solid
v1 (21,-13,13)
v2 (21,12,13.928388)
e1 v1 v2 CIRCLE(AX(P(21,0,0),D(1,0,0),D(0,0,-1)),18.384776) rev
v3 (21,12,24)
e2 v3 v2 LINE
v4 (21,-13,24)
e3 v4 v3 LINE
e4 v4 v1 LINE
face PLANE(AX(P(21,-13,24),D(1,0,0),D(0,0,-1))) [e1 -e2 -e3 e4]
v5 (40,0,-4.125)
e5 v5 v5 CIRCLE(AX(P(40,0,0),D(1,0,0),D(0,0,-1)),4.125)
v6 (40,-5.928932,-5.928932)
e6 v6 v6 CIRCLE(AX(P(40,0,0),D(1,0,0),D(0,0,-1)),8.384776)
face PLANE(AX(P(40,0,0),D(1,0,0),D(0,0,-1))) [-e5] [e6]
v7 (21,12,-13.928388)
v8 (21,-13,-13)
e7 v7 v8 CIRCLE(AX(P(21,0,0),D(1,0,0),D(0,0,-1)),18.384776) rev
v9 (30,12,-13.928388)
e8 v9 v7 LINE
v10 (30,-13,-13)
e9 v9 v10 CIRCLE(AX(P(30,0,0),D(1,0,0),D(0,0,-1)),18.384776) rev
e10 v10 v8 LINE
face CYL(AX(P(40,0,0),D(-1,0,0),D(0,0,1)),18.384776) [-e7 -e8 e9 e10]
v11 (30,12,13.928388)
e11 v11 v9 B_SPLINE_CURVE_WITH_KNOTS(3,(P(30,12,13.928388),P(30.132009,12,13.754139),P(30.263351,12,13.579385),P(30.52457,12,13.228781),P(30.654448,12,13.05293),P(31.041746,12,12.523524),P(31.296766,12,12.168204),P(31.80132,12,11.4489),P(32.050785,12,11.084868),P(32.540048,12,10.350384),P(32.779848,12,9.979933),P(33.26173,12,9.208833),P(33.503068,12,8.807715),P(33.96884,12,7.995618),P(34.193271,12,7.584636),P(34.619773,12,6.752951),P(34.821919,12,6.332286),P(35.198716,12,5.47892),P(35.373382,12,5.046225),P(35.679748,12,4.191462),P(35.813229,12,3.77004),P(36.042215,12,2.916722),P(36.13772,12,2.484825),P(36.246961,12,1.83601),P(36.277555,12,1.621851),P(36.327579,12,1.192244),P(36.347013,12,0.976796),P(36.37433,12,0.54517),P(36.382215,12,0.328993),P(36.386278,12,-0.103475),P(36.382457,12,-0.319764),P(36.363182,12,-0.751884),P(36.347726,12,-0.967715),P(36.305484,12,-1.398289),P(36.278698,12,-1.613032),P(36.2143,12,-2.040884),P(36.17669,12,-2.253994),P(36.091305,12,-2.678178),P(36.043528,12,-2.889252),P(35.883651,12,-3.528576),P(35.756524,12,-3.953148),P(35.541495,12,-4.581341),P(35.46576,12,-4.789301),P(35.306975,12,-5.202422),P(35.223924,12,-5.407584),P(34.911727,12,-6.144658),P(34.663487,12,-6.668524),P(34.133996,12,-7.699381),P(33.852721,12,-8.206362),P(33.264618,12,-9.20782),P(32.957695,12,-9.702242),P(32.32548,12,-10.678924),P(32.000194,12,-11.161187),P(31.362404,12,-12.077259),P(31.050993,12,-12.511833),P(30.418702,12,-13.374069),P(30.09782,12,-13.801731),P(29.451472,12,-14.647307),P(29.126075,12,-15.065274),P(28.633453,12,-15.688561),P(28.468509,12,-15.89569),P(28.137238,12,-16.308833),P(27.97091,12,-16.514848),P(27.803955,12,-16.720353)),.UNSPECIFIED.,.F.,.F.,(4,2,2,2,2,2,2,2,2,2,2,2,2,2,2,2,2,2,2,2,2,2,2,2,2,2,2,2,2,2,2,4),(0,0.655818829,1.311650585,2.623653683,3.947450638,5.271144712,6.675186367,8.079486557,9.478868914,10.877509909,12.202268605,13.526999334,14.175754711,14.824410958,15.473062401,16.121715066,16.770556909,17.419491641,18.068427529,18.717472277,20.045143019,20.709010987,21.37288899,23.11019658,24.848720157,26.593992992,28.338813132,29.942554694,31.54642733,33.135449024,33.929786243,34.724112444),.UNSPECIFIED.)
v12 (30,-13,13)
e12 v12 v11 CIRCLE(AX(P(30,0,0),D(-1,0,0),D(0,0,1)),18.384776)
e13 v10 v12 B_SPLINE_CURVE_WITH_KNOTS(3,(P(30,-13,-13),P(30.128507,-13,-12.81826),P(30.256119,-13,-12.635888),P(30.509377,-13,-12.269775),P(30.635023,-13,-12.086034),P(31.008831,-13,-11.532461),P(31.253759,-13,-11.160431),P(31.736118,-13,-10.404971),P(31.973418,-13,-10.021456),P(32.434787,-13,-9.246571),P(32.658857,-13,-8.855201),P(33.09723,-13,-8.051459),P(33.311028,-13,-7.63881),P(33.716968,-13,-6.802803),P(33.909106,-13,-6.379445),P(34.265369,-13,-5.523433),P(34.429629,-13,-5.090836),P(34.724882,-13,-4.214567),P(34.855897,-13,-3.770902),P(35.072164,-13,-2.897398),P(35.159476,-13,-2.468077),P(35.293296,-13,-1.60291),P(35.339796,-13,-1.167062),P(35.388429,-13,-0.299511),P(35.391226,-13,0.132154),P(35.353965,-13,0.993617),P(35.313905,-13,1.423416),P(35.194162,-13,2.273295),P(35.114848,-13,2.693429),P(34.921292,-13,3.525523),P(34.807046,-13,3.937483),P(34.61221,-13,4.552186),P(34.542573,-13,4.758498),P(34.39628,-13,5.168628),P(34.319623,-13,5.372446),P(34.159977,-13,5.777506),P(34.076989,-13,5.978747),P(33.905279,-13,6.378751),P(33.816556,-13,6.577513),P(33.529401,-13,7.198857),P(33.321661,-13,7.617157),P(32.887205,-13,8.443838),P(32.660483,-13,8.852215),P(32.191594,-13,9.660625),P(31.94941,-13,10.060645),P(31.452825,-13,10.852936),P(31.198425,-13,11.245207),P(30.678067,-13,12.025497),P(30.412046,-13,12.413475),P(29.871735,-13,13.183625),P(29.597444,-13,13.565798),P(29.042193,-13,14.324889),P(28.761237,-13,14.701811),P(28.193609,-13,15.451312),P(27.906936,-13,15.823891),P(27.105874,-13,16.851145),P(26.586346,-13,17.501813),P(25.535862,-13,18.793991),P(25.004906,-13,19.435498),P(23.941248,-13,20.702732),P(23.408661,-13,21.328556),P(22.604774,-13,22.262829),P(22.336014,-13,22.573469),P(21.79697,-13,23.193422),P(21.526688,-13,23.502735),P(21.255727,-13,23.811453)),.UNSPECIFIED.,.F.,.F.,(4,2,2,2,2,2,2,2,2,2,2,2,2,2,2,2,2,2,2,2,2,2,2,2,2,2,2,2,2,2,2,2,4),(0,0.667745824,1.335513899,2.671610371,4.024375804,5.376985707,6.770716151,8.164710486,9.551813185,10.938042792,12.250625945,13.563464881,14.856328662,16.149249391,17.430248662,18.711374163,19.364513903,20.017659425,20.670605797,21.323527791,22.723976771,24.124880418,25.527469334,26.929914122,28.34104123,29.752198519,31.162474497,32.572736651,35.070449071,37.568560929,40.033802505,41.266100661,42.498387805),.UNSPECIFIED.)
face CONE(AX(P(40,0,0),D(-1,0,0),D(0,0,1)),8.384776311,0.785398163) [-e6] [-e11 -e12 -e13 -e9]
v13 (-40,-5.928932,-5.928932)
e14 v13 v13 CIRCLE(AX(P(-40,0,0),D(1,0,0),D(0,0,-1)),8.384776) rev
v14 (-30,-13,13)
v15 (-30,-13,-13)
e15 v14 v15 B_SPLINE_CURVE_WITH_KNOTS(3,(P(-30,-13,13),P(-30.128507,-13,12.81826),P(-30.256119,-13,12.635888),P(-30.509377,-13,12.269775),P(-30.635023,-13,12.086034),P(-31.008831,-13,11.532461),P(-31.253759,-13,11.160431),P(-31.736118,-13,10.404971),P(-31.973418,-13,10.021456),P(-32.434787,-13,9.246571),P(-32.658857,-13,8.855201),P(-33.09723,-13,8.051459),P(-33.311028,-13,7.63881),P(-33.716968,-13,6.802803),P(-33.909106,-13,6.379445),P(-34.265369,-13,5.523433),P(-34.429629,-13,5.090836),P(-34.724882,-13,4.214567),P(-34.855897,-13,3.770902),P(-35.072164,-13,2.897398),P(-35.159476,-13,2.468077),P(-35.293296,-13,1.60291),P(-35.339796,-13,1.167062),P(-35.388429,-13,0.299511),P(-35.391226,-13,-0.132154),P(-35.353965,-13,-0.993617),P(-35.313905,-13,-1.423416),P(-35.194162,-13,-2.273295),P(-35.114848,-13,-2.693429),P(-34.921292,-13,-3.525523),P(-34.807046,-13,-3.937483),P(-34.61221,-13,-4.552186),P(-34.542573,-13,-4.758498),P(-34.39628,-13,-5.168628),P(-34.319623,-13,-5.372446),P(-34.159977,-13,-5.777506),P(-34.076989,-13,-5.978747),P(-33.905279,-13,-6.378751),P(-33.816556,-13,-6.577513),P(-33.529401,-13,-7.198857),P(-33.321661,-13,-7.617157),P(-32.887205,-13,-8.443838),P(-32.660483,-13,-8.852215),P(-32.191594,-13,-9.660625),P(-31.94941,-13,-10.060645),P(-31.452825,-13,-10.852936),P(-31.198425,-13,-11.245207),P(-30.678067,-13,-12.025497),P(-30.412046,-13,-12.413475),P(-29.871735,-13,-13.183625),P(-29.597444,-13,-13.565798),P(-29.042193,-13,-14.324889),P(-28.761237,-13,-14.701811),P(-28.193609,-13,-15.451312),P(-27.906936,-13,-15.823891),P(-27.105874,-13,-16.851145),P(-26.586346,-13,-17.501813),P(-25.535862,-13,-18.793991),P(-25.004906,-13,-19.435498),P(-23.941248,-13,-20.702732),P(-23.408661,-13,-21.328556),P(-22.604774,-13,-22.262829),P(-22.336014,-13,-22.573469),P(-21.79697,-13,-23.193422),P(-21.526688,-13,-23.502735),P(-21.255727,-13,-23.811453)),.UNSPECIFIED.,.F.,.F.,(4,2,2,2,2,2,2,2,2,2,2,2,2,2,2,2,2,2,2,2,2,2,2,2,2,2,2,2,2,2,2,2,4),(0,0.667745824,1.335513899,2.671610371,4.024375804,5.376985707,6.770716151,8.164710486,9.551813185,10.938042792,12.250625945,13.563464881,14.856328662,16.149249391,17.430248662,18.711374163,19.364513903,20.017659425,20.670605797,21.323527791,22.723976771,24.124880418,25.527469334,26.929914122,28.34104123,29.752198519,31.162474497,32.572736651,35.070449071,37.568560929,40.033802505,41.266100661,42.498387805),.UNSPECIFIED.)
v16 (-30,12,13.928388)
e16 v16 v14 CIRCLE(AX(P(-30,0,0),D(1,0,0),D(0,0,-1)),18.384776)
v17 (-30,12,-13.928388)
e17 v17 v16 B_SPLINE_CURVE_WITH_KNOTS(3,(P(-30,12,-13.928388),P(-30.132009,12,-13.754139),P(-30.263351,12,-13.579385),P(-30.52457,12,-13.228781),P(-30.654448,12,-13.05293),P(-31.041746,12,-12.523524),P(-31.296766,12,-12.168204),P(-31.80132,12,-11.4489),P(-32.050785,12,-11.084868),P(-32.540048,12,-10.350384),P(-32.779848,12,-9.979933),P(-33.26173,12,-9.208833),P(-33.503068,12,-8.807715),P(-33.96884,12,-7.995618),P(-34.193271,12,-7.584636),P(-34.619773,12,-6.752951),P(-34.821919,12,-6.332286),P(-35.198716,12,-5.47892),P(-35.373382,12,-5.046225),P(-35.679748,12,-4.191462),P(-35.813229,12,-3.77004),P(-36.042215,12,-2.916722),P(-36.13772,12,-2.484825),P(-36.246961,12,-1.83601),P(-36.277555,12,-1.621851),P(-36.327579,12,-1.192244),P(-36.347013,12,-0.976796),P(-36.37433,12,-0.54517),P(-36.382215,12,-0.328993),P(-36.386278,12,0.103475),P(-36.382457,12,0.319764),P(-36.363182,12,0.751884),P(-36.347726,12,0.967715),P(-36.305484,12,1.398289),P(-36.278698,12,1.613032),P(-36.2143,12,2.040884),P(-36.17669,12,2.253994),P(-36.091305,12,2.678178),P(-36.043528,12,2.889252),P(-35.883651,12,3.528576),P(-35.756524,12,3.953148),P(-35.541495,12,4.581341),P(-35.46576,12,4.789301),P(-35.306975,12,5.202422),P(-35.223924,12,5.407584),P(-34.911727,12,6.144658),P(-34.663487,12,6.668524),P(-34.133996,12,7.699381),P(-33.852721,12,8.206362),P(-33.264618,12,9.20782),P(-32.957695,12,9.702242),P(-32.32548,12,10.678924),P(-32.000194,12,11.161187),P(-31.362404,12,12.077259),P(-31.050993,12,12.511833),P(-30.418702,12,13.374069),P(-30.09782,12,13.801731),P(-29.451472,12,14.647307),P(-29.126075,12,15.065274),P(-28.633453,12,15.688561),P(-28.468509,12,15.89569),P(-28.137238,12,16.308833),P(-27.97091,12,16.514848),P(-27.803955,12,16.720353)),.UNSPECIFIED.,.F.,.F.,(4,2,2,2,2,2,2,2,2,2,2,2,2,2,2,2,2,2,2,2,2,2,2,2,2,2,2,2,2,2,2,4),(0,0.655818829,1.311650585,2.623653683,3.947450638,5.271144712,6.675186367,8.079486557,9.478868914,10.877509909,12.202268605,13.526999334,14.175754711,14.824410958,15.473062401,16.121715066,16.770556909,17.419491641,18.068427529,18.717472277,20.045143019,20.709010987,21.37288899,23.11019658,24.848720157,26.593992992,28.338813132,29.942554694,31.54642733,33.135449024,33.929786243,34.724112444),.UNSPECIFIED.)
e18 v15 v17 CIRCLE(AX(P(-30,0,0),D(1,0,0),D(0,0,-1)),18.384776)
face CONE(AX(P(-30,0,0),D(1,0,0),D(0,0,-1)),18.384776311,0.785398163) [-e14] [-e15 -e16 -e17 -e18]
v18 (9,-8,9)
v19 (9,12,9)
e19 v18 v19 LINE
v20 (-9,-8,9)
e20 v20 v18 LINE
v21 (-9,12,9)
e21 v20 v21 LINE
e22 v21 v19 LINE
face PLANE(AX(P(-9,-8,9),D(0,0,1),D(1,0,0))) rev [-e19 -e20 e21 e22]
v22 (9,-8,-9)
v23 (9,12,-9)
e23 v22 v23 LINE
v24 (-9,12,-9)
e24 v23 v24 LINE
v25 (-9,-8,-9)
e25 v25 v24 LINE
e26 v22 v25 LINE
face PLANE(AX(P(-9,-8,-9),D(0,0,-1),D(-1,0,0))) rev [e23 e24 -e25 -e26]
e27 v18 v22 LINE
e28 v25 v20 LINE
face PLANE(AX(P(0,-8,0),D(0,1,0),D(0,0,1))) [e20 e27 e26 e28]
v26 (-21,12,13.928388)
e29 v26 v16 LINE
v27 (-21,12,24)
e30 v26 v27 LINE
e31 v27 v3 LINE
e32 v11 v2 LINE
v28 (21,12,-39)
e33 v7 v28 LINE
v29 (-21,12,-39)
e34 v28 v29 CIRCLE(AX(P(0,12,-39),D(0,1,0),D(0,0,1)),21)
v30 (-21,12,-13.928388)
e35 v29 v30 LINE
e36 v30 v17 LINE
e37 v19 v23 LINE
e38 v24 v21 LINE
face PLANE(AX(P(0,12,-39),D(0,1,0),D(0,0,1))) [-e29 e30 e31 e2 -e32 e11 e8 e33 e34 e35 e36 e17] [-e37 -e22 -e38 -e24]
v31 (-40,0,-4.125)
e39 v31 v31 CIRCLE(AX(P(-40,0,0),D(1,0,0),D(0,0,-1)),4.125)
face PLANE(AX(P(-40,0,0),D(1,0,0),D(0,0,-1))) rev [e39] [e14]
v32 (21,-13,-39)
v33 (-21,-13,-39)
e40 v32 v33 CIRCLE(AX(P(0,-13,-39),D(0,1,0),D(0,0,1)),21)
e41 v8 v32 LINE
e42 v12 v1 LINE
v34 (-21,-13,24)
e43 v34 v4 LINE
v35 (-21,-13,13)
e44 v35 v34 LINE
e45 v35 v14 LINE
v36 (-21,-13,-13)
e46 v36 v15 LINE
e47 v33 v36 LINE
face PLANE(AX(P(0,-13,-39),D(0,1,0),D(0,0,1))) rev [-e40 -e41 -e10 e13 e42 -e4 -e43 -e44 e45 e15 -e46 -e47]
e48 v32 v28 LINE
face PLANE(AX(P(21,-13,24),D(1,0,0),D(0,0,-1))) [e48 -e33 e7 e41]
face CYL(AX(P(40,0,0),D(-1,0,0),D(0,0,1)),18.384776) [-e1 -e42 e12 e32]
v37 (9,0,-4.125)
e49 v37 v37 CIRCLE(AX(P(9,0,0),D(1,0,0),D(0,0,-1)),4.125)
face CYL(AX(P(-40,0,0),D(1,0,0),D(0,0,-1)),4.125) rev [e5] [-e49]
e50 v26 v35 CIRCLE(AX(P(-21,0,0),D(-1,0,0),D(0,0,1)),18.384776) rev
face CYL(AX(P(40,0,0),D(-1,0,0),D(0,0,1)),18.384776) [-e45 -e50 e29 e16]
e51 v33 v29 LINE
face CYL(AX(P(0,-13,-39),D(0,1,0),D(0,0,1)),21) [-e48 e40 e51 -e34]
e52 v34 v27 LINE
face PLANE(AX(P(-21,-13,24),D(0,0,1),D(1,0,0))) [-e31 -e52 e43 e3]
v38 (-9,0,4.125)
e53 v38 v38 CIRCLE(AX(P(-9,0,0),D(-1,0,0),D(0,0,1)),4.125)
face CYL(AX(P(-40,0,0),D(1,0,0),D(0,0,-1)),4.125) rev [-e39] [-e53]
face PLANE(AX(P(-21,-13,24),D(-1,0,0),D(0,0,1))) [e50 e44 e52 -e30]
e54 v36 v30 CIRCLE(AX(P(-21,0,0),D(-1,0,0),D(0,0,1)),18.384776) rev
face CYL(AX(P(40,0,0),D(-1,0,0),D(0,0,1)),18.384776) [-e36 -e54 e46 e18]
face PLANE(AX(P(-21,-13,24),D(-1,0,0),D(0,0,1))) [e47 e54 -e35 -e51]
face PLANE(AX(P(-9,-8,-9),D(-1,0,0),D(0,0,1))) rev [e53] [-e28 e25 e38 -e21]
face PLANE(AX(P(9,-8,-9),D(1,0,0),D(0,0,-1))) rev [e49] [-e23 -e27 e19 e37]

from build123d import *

# Parameters (mm, degrees)
BOSS_EXTRUDE1_DEPTH      = 12
BOSS_EXTRUDE1_DEPTH_BACK = 13
BOSS_EXTRUDE2_START      = -40
BOSS_EXTRUDE2_DEPTH      = 80
SKETCH2_W                = 18
SKETCH2_H                = 18
CUT_EXTRUDE1_DEPTH       = 20
CUT_EXTRUDE2_DEPTH       = 74.273460407
CUT_EXTRUDE2_DEPTH_BACK  = 74.273460407
SKETCH5_R                = 4.125
CHAMFER1_SIZE            = 10


# Read off the part's stored shape, not the designer's step: Boss-Extrude2
with BuildPart() as part:
    # Sketch1 → Boss-Extrude1 (new, two sides: drawn at the far end of the back side and taken through both)
    with BuildSketch(Plane(origin=(0, 0, 0), x_dir=(1, 0, 0), z_dir=(0, 1, 0)).offset(-BOSS_EXTRUDE1_DEPTH_BACK)):
        with BuildLine():
            Line((-21, -24), (21, -24))
            Line((21, -24), (21, 39))
            ThreePointArc((21, 39), (0, 60), (-21, 39))
            Line((-21, 39), (-21, -24))
        make_face()
    extrude(amount=BOSS_EXTRUDE1_DEPTH + BOSS_EXTRUDE1_DEPTH_BACK)

    # Boss-Extrude2 outline → Boss-Extrude2 (add)
    with BuildSketch(Plane(origin=(0, 0, 0), x_dir=(0, 0, -1), z_dir=(1, 0, 0)).offset(BOSS_EXTRUDE2_START)):
        with BuildLine():
            Line((-13, -13), (13, -13))
            ThreePointArc((13, -13), (18.372112666, -0.682258161), (13.928388277, 12))
            Line((13.928388277, 12), (-13.928388277, 12))
            ThreePointArc((-13.928388277, 12), (-18.372112666, -0.682258161), (-13, -13))
        make_face()
    extrude(amount=BOSS_EXTRUDE2_DEPTH)

    # Sketch2 → Cut-Extrude1 (cut)
    with BuildSketch(Plane(origin=(0, 12, 0), x_dir=(1, 0, 0), z_dir=(0, 1, 0))):
        Rectangle(SKETCH2_W, SKETCH2_H)
    extrude(amount=-CUT_EXTRUDE1_DEPTH, mode=Mode.SUBTRACT)

    # Sketch5 → Cut-Extrude2 (cut, two sides: drawn at the far end of the back side and taken through both)
    with BuildSketch(Plane(origin=(0, 0, 0), x_dir=(0, 0, -1), z_dir=(1, 0, 0)).offset(-CUT_EXTRUDE2_DEPTH_BACK)):
        Circle(SKETCH5_R)
    extrude(amount=CUT_EXTRUDE2_DEPTH + CUT_EXTRUDE2_DEPTH_BACK, mode=Mode.SUBTRACT)

    # Chamfer1
    # the kernel refuses this chamfer: 10 mm, written as the material it takes off along each edge
    with BuildSketch(Plane(origin=(40, 0, -1e-09), x_dir=(0, -0.8173943471187031, 0.5760785374394618), z_dir=(0, 0.5760785374394618, 0.8173943471187031))) as chamfer1_piece_1:
        Polygon((18.38477631 - CHAMFER1_SIZE, 0), (18.38477631, -CHAMFER1_SIZE), (18.38477631, 0), align=None)
    revolve(axis=Axis((40, 0, -1e-09), (1, 0, 0)), revolution_arc=246.096931862, mode=Mode.SUBTRACT)
    with BuildSketch(Plane(origin=(40, 0, 1e-09), x_dir=(0, 0.8578700425310862, -0.5138667046304052), z_dir=(0, -0.5138667046304052, -0.8578700425310862))) as chamfer1_piece_2:
        Polygon((18.38477631, -CHAMFER1_SIZE), (18.38477631 - CHAMFER1_SIZE, 0), (18.38477631, 0), align=None)
    revolve(axis=Axis((40, 0, 1e-09), (1, 0, 0)), revolution_arc=246.096931862, mode=Mode.SUBTRACT)
    with BuildSketch(Plane(origin=(-40, 0, 1e-09), x_dir=(0, 0.8578700425310862, -0.5138667046304052), z_dir=(0, -0.5138667046304052, -0.8578700425310862))) as chamfer1_piece_3:
        Polygon((18.38477631, CHAMFER1_SIZE), (18.38477631 - CHAMFER1_SIZE, 0), (18.38477631, 0), align=None)
    revolve(axis=Axis((-40, 0, 1e-09), (1, 0, 0)), revolution_arc=246.096931862, mode=Mode.SUBTRACT)
    with BuildSketch(Plane(origin=(-40, 0, -1e-09), x_dir=(0, -0.8173943471187031, 0.5760785374394618), z_dir=(0, 0.5760785374394618, 0.8173943471187031))) as chamfer1_piece_4:
        Polygon((18.38477631 - CHAMFER1_SIZE, 0), (18.38477631, CHAMFER1_SIZE), (18.38477631, 0), align=None)
    revolve(axis=Axis((-40, 0, -1e-09), (1, 0, 0)), revolution_arc=246.096931862, mode=Mode.SUBTRACT)


solid = part.part
